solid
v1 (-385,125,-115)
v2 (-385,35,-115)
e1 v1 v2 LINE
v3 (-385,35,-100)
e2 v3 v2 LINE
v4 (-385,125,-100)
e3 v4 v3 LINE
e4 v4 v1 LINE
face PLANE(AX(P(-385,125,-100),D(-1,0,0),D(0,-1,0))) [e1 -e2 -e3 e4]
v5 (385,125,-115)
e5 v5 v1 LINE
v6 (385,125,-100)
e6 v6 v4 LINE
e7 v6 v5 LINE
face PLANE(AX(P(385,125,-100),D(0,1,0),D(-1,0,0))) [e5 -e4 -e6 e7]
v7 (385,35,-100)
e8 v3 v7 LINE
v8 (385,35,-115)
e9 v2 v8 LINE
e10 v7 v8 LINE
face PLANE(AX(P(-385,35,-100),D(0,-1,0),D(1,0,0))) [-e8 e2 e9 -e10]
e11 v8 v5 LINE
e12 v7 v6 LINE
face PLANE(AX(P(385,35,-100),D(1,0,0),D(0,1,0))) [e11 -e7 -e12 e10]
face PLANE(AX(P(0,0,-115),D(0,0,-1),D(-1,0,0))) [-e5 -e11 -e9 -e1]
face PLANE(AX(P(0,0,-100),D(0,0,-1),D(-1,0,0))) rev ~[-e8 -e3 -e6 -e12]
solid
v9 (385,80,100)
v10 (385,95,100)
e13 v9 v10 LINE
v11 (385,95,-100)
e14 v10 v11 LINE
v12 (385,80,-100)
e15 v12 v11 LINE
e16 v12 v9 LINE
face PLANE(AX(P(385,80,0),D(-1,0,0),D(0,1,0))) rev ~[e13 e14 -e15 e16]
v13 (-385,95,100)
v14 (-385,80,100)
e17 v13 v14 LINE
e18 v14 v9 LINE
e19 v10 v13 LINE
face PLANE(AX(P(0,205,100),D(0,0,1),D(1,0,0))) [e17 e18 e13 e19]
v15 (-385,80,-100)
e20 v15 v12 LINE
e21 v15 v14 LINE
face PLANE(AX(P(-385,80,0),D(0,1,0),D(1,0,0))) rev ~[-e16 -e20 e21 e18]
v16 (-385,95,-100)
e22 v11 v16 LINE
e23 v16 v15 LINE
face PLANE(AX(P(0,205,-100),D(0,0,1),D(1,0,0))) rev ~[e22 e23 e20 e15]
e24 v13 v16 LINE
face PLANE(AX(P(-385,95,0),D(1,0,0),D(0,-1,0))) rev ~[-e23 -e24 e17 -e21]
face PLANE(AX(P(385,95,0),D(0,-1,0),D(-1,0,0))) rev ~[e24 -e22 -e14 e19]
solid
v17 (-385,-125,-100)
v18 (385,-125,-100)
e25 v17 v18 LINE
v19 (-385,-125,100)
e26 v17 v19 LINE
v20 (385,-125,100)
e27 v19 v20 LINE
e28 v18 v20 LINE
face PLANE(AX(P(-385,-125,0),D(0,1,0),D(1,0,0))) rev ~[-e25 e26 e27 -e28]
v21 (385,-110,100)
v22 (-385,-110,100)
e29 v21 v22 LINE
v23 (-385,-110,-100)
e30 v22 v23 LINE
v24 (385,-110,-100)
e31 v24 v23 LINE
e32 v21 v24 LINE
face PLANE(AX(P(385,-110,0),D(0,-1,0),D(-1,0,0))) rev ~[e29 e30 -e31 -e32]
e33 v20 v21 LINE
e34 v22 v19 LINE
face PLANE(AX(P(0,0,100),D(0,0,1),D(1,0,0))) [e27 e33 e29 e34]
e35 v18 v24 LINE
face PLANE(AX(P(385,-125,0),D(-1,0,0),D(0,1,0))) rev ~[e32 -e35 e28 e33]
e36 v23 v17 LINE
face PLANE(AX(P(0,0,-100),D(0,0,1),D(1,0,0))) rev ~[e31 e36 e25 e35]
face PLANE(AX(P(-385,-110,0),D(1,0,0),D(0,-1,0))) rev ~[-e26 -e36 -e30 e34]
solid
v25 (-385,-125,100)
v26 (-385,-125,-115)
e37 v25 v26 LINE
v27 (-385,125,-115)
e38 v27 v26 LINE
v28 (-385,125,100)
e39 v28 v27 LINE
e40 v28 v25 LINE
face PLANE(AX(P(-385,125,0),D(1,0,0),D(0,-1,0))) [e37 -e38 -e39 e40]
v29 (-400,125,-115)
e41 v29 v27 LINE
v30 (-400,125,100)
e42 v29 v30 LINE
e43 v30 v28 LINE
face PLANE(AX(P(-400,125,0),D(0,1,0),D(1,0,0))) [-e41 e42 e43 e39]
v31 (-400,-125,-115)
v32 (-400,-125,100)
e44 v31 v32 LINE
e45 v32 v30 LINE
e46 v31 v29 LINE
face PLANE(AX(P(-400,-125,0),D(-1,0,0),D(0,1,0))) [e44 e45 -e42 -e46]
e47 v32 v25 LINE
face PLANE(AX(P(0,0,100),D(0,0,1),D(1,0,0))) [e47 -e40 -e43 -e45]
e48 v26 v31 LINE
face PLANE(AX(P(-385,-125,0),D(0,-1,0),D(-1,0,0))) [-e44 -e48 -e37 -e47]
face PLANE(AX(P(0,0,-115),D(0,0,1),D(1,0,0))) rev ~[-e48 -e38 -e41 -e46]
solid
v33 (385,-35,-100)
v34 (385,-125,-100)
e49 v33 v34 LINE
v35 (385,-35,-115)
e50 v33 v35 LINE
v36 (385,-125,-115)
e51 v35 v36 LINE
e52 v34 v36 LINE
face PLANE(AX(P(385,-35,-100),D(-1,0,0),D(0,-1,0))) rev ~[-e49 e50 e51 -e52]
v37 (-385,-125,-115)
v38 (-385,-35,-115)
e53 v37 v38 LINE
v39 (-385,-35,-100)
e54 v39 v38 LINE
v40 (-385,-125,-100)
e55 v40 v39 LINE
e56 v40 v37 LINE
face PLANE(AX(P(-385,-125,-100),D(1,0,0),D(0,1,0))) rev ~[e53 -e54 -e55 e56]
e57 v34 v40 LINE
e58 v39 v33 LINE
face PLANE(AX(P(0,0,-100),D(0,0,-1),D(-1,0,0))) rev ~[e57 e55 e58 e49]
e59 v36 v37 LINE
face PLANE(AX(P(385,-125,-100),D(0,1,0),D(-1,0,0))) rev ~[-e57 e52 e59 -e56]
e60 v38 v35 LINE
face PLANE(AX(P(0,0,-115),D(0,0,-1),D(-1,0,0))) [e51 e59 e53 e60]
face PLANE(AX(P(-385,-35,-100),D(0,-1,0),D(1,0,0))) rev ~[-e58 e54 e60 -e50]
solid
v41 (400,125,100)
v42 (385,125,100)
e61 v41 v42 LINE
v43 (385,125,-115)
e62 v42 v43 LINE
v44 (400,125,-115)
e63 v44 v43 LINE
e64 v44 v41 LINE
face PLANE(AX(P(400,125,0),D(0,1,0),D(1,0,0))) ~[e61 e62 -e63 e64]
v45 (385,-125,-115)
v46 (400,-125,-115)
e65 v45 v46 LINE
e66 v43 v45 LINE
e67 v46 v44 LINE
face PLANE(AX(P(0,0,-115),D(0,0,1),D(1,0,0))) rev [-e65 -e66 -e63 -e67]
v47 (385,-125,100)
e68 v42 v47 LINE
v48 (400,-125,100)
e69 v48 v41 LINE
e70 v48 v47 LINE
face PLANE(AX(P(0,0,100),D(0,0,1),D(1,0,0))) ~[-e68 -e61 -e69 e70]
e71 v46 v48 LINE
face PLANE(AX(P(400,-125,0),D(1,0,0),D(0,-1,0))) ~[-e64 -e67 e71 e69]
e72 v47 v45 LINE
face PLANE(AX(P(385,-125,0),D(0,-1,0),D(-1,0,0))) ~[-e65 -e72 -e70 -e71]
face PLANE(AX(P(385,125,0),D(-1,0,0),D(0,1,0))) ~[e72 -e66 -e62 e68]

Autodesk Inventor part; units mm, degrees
ref_plane "YZ Plane" through (0, 0, 0) normal (1, 0, 0) x (0, 1, 0)
ref_plane "XZ Plane" through (0, 0, 0) normal (0, 1, 0) x (-1, 0, 0)
ref_plane "XY Plane" through (0, 0, 0) normal (0, 0, 1) x (1, 0, 0)
sketch "Sketch1" plane through (0, 0, 0) normal (0, 0, 1) x (1, 0, 0)
  line L0 (-400, 125) -> (400, 125)
  line L1 (400, 125) -> (400, -125)
  line L2 (400, -125) -> (-400, -125)
  line L3 (-400, -125) -> (-400, 125)
  line L4 (-400, 125) -> (400, -125) construction
  line L5 (400, 125) -> (-400, -125) construction
  point P0 (0, 0)
  dimension "d0" = 800
  dimension "d1" = 250
sketch "Sketch2" plane through (0, 0, 0) normal (0, 1, 0) x (-1, 0, 0)
  line L0 (400, -100) -> (-400, -100)
  line L1 (-400, -100) -> (-400, 100)
  line L2 (-400, 100) -> (400, 100)
  line L3 (400, 100) -> (400, -100)
  line L4 (400, -100) -> (-400, 100) construction
  line L5 (-400, -100) -> (400, 100) construction
  point P0 (0, 0)
  dimension "d2" = 800
  dimension "d3" = 200
sketch "Sketch3" plane through (0, 0, 0) normal (0, 0, 1) x (1, 0, 0)
  line L0 (-400, -125) -> (-400, 125) construction
  line L1 (-400, 125) -> (-385, 125)
  line L2 (-385, 125) -> (-385, -125)
  line L3 (-385, -125) -> (-400, -125)
  line L4 (-400, -125) -> (-400, 125)
  point P0 (0, 0)
  dimension "d4" = 15
extrude "Extrusion1" add sketch "Sketch3" along normal mid plane 200
move faces "Move1" translate (0, 0, -15) faces at (-395, 41.6667, -100)
mirror "Mirror1" about plane through (0, 0, 0) normal (1, 0, 0)
sketch "Sketch4" plane through (0, 0, 0) normal (0, 0, 1) x (1, 0, 0)
  line L0 (400, -125) -> (-400, -125) construction
  line L1 (-385, -125) -> (-385, 125) construction
  line L2 (385, -125) -> (385, 125) construction
  line L3 (-385, -125) -> (385, -125)
  line L4 (385, -125) -> (385, -110)
  line L5 (385, -110) -> (-385, -110)
  line L6 (-385, -110) -> (-385, -125)
  point P0 (0, 0)
  dimension "d7" = 15
extrude "Extrusion2" add sketch "Sketch4" along normal mid plane 200 separate body
pattern_linear "Rectangular Pattern1" count 2 spacing 205 along (0, 1, 0) bodies 2
sketch "Sketch5" plane through (0, 0, -100) normal (0, 0, -1) x (-1, 0, 0)
  line L0 (-385, 125) -> (-385, -125) construction
  line L1 (385, 125) -> (385, -125) construction
  line L2 (-385, -125) -> (385, -125) construction
  line L3 (-385, 125) -> (385, 125)
  line L4 (385, 125) -> (385, 35)
  line L5 (385, 35) -> (-385, 35)
  line L6 (-385, 35) -> (-385, 125)
  line L7 (-385, -125) -> (385, -125)
  line L8 (385, -125) -> (385, -35)
  line L9 (385, -35) -> (-385, -35)
  line L10 (-385, -35) -> (-385, -125)
  point P0 (0, 0)
  dimension "d16" = 90
  dimension "d17" = 90
extrude "Extrusion3" add sketch "Sketch5" along normal blind 15 separate body contours L10 L9 L8 L7
extrude "Extrusion4" add sketch "Sketch5" along normal blind 15 separate body contours L3 L4 L5 L6
equation "\"d5\" = d3"
equation "\"d8\" = d3"
equation "\"d17\" = d16"
equation "\"d18\" = d4"
equation "\"d20\" = d4"
properties part number "MM_00001.1.0" material "Wood (Cherry)"
